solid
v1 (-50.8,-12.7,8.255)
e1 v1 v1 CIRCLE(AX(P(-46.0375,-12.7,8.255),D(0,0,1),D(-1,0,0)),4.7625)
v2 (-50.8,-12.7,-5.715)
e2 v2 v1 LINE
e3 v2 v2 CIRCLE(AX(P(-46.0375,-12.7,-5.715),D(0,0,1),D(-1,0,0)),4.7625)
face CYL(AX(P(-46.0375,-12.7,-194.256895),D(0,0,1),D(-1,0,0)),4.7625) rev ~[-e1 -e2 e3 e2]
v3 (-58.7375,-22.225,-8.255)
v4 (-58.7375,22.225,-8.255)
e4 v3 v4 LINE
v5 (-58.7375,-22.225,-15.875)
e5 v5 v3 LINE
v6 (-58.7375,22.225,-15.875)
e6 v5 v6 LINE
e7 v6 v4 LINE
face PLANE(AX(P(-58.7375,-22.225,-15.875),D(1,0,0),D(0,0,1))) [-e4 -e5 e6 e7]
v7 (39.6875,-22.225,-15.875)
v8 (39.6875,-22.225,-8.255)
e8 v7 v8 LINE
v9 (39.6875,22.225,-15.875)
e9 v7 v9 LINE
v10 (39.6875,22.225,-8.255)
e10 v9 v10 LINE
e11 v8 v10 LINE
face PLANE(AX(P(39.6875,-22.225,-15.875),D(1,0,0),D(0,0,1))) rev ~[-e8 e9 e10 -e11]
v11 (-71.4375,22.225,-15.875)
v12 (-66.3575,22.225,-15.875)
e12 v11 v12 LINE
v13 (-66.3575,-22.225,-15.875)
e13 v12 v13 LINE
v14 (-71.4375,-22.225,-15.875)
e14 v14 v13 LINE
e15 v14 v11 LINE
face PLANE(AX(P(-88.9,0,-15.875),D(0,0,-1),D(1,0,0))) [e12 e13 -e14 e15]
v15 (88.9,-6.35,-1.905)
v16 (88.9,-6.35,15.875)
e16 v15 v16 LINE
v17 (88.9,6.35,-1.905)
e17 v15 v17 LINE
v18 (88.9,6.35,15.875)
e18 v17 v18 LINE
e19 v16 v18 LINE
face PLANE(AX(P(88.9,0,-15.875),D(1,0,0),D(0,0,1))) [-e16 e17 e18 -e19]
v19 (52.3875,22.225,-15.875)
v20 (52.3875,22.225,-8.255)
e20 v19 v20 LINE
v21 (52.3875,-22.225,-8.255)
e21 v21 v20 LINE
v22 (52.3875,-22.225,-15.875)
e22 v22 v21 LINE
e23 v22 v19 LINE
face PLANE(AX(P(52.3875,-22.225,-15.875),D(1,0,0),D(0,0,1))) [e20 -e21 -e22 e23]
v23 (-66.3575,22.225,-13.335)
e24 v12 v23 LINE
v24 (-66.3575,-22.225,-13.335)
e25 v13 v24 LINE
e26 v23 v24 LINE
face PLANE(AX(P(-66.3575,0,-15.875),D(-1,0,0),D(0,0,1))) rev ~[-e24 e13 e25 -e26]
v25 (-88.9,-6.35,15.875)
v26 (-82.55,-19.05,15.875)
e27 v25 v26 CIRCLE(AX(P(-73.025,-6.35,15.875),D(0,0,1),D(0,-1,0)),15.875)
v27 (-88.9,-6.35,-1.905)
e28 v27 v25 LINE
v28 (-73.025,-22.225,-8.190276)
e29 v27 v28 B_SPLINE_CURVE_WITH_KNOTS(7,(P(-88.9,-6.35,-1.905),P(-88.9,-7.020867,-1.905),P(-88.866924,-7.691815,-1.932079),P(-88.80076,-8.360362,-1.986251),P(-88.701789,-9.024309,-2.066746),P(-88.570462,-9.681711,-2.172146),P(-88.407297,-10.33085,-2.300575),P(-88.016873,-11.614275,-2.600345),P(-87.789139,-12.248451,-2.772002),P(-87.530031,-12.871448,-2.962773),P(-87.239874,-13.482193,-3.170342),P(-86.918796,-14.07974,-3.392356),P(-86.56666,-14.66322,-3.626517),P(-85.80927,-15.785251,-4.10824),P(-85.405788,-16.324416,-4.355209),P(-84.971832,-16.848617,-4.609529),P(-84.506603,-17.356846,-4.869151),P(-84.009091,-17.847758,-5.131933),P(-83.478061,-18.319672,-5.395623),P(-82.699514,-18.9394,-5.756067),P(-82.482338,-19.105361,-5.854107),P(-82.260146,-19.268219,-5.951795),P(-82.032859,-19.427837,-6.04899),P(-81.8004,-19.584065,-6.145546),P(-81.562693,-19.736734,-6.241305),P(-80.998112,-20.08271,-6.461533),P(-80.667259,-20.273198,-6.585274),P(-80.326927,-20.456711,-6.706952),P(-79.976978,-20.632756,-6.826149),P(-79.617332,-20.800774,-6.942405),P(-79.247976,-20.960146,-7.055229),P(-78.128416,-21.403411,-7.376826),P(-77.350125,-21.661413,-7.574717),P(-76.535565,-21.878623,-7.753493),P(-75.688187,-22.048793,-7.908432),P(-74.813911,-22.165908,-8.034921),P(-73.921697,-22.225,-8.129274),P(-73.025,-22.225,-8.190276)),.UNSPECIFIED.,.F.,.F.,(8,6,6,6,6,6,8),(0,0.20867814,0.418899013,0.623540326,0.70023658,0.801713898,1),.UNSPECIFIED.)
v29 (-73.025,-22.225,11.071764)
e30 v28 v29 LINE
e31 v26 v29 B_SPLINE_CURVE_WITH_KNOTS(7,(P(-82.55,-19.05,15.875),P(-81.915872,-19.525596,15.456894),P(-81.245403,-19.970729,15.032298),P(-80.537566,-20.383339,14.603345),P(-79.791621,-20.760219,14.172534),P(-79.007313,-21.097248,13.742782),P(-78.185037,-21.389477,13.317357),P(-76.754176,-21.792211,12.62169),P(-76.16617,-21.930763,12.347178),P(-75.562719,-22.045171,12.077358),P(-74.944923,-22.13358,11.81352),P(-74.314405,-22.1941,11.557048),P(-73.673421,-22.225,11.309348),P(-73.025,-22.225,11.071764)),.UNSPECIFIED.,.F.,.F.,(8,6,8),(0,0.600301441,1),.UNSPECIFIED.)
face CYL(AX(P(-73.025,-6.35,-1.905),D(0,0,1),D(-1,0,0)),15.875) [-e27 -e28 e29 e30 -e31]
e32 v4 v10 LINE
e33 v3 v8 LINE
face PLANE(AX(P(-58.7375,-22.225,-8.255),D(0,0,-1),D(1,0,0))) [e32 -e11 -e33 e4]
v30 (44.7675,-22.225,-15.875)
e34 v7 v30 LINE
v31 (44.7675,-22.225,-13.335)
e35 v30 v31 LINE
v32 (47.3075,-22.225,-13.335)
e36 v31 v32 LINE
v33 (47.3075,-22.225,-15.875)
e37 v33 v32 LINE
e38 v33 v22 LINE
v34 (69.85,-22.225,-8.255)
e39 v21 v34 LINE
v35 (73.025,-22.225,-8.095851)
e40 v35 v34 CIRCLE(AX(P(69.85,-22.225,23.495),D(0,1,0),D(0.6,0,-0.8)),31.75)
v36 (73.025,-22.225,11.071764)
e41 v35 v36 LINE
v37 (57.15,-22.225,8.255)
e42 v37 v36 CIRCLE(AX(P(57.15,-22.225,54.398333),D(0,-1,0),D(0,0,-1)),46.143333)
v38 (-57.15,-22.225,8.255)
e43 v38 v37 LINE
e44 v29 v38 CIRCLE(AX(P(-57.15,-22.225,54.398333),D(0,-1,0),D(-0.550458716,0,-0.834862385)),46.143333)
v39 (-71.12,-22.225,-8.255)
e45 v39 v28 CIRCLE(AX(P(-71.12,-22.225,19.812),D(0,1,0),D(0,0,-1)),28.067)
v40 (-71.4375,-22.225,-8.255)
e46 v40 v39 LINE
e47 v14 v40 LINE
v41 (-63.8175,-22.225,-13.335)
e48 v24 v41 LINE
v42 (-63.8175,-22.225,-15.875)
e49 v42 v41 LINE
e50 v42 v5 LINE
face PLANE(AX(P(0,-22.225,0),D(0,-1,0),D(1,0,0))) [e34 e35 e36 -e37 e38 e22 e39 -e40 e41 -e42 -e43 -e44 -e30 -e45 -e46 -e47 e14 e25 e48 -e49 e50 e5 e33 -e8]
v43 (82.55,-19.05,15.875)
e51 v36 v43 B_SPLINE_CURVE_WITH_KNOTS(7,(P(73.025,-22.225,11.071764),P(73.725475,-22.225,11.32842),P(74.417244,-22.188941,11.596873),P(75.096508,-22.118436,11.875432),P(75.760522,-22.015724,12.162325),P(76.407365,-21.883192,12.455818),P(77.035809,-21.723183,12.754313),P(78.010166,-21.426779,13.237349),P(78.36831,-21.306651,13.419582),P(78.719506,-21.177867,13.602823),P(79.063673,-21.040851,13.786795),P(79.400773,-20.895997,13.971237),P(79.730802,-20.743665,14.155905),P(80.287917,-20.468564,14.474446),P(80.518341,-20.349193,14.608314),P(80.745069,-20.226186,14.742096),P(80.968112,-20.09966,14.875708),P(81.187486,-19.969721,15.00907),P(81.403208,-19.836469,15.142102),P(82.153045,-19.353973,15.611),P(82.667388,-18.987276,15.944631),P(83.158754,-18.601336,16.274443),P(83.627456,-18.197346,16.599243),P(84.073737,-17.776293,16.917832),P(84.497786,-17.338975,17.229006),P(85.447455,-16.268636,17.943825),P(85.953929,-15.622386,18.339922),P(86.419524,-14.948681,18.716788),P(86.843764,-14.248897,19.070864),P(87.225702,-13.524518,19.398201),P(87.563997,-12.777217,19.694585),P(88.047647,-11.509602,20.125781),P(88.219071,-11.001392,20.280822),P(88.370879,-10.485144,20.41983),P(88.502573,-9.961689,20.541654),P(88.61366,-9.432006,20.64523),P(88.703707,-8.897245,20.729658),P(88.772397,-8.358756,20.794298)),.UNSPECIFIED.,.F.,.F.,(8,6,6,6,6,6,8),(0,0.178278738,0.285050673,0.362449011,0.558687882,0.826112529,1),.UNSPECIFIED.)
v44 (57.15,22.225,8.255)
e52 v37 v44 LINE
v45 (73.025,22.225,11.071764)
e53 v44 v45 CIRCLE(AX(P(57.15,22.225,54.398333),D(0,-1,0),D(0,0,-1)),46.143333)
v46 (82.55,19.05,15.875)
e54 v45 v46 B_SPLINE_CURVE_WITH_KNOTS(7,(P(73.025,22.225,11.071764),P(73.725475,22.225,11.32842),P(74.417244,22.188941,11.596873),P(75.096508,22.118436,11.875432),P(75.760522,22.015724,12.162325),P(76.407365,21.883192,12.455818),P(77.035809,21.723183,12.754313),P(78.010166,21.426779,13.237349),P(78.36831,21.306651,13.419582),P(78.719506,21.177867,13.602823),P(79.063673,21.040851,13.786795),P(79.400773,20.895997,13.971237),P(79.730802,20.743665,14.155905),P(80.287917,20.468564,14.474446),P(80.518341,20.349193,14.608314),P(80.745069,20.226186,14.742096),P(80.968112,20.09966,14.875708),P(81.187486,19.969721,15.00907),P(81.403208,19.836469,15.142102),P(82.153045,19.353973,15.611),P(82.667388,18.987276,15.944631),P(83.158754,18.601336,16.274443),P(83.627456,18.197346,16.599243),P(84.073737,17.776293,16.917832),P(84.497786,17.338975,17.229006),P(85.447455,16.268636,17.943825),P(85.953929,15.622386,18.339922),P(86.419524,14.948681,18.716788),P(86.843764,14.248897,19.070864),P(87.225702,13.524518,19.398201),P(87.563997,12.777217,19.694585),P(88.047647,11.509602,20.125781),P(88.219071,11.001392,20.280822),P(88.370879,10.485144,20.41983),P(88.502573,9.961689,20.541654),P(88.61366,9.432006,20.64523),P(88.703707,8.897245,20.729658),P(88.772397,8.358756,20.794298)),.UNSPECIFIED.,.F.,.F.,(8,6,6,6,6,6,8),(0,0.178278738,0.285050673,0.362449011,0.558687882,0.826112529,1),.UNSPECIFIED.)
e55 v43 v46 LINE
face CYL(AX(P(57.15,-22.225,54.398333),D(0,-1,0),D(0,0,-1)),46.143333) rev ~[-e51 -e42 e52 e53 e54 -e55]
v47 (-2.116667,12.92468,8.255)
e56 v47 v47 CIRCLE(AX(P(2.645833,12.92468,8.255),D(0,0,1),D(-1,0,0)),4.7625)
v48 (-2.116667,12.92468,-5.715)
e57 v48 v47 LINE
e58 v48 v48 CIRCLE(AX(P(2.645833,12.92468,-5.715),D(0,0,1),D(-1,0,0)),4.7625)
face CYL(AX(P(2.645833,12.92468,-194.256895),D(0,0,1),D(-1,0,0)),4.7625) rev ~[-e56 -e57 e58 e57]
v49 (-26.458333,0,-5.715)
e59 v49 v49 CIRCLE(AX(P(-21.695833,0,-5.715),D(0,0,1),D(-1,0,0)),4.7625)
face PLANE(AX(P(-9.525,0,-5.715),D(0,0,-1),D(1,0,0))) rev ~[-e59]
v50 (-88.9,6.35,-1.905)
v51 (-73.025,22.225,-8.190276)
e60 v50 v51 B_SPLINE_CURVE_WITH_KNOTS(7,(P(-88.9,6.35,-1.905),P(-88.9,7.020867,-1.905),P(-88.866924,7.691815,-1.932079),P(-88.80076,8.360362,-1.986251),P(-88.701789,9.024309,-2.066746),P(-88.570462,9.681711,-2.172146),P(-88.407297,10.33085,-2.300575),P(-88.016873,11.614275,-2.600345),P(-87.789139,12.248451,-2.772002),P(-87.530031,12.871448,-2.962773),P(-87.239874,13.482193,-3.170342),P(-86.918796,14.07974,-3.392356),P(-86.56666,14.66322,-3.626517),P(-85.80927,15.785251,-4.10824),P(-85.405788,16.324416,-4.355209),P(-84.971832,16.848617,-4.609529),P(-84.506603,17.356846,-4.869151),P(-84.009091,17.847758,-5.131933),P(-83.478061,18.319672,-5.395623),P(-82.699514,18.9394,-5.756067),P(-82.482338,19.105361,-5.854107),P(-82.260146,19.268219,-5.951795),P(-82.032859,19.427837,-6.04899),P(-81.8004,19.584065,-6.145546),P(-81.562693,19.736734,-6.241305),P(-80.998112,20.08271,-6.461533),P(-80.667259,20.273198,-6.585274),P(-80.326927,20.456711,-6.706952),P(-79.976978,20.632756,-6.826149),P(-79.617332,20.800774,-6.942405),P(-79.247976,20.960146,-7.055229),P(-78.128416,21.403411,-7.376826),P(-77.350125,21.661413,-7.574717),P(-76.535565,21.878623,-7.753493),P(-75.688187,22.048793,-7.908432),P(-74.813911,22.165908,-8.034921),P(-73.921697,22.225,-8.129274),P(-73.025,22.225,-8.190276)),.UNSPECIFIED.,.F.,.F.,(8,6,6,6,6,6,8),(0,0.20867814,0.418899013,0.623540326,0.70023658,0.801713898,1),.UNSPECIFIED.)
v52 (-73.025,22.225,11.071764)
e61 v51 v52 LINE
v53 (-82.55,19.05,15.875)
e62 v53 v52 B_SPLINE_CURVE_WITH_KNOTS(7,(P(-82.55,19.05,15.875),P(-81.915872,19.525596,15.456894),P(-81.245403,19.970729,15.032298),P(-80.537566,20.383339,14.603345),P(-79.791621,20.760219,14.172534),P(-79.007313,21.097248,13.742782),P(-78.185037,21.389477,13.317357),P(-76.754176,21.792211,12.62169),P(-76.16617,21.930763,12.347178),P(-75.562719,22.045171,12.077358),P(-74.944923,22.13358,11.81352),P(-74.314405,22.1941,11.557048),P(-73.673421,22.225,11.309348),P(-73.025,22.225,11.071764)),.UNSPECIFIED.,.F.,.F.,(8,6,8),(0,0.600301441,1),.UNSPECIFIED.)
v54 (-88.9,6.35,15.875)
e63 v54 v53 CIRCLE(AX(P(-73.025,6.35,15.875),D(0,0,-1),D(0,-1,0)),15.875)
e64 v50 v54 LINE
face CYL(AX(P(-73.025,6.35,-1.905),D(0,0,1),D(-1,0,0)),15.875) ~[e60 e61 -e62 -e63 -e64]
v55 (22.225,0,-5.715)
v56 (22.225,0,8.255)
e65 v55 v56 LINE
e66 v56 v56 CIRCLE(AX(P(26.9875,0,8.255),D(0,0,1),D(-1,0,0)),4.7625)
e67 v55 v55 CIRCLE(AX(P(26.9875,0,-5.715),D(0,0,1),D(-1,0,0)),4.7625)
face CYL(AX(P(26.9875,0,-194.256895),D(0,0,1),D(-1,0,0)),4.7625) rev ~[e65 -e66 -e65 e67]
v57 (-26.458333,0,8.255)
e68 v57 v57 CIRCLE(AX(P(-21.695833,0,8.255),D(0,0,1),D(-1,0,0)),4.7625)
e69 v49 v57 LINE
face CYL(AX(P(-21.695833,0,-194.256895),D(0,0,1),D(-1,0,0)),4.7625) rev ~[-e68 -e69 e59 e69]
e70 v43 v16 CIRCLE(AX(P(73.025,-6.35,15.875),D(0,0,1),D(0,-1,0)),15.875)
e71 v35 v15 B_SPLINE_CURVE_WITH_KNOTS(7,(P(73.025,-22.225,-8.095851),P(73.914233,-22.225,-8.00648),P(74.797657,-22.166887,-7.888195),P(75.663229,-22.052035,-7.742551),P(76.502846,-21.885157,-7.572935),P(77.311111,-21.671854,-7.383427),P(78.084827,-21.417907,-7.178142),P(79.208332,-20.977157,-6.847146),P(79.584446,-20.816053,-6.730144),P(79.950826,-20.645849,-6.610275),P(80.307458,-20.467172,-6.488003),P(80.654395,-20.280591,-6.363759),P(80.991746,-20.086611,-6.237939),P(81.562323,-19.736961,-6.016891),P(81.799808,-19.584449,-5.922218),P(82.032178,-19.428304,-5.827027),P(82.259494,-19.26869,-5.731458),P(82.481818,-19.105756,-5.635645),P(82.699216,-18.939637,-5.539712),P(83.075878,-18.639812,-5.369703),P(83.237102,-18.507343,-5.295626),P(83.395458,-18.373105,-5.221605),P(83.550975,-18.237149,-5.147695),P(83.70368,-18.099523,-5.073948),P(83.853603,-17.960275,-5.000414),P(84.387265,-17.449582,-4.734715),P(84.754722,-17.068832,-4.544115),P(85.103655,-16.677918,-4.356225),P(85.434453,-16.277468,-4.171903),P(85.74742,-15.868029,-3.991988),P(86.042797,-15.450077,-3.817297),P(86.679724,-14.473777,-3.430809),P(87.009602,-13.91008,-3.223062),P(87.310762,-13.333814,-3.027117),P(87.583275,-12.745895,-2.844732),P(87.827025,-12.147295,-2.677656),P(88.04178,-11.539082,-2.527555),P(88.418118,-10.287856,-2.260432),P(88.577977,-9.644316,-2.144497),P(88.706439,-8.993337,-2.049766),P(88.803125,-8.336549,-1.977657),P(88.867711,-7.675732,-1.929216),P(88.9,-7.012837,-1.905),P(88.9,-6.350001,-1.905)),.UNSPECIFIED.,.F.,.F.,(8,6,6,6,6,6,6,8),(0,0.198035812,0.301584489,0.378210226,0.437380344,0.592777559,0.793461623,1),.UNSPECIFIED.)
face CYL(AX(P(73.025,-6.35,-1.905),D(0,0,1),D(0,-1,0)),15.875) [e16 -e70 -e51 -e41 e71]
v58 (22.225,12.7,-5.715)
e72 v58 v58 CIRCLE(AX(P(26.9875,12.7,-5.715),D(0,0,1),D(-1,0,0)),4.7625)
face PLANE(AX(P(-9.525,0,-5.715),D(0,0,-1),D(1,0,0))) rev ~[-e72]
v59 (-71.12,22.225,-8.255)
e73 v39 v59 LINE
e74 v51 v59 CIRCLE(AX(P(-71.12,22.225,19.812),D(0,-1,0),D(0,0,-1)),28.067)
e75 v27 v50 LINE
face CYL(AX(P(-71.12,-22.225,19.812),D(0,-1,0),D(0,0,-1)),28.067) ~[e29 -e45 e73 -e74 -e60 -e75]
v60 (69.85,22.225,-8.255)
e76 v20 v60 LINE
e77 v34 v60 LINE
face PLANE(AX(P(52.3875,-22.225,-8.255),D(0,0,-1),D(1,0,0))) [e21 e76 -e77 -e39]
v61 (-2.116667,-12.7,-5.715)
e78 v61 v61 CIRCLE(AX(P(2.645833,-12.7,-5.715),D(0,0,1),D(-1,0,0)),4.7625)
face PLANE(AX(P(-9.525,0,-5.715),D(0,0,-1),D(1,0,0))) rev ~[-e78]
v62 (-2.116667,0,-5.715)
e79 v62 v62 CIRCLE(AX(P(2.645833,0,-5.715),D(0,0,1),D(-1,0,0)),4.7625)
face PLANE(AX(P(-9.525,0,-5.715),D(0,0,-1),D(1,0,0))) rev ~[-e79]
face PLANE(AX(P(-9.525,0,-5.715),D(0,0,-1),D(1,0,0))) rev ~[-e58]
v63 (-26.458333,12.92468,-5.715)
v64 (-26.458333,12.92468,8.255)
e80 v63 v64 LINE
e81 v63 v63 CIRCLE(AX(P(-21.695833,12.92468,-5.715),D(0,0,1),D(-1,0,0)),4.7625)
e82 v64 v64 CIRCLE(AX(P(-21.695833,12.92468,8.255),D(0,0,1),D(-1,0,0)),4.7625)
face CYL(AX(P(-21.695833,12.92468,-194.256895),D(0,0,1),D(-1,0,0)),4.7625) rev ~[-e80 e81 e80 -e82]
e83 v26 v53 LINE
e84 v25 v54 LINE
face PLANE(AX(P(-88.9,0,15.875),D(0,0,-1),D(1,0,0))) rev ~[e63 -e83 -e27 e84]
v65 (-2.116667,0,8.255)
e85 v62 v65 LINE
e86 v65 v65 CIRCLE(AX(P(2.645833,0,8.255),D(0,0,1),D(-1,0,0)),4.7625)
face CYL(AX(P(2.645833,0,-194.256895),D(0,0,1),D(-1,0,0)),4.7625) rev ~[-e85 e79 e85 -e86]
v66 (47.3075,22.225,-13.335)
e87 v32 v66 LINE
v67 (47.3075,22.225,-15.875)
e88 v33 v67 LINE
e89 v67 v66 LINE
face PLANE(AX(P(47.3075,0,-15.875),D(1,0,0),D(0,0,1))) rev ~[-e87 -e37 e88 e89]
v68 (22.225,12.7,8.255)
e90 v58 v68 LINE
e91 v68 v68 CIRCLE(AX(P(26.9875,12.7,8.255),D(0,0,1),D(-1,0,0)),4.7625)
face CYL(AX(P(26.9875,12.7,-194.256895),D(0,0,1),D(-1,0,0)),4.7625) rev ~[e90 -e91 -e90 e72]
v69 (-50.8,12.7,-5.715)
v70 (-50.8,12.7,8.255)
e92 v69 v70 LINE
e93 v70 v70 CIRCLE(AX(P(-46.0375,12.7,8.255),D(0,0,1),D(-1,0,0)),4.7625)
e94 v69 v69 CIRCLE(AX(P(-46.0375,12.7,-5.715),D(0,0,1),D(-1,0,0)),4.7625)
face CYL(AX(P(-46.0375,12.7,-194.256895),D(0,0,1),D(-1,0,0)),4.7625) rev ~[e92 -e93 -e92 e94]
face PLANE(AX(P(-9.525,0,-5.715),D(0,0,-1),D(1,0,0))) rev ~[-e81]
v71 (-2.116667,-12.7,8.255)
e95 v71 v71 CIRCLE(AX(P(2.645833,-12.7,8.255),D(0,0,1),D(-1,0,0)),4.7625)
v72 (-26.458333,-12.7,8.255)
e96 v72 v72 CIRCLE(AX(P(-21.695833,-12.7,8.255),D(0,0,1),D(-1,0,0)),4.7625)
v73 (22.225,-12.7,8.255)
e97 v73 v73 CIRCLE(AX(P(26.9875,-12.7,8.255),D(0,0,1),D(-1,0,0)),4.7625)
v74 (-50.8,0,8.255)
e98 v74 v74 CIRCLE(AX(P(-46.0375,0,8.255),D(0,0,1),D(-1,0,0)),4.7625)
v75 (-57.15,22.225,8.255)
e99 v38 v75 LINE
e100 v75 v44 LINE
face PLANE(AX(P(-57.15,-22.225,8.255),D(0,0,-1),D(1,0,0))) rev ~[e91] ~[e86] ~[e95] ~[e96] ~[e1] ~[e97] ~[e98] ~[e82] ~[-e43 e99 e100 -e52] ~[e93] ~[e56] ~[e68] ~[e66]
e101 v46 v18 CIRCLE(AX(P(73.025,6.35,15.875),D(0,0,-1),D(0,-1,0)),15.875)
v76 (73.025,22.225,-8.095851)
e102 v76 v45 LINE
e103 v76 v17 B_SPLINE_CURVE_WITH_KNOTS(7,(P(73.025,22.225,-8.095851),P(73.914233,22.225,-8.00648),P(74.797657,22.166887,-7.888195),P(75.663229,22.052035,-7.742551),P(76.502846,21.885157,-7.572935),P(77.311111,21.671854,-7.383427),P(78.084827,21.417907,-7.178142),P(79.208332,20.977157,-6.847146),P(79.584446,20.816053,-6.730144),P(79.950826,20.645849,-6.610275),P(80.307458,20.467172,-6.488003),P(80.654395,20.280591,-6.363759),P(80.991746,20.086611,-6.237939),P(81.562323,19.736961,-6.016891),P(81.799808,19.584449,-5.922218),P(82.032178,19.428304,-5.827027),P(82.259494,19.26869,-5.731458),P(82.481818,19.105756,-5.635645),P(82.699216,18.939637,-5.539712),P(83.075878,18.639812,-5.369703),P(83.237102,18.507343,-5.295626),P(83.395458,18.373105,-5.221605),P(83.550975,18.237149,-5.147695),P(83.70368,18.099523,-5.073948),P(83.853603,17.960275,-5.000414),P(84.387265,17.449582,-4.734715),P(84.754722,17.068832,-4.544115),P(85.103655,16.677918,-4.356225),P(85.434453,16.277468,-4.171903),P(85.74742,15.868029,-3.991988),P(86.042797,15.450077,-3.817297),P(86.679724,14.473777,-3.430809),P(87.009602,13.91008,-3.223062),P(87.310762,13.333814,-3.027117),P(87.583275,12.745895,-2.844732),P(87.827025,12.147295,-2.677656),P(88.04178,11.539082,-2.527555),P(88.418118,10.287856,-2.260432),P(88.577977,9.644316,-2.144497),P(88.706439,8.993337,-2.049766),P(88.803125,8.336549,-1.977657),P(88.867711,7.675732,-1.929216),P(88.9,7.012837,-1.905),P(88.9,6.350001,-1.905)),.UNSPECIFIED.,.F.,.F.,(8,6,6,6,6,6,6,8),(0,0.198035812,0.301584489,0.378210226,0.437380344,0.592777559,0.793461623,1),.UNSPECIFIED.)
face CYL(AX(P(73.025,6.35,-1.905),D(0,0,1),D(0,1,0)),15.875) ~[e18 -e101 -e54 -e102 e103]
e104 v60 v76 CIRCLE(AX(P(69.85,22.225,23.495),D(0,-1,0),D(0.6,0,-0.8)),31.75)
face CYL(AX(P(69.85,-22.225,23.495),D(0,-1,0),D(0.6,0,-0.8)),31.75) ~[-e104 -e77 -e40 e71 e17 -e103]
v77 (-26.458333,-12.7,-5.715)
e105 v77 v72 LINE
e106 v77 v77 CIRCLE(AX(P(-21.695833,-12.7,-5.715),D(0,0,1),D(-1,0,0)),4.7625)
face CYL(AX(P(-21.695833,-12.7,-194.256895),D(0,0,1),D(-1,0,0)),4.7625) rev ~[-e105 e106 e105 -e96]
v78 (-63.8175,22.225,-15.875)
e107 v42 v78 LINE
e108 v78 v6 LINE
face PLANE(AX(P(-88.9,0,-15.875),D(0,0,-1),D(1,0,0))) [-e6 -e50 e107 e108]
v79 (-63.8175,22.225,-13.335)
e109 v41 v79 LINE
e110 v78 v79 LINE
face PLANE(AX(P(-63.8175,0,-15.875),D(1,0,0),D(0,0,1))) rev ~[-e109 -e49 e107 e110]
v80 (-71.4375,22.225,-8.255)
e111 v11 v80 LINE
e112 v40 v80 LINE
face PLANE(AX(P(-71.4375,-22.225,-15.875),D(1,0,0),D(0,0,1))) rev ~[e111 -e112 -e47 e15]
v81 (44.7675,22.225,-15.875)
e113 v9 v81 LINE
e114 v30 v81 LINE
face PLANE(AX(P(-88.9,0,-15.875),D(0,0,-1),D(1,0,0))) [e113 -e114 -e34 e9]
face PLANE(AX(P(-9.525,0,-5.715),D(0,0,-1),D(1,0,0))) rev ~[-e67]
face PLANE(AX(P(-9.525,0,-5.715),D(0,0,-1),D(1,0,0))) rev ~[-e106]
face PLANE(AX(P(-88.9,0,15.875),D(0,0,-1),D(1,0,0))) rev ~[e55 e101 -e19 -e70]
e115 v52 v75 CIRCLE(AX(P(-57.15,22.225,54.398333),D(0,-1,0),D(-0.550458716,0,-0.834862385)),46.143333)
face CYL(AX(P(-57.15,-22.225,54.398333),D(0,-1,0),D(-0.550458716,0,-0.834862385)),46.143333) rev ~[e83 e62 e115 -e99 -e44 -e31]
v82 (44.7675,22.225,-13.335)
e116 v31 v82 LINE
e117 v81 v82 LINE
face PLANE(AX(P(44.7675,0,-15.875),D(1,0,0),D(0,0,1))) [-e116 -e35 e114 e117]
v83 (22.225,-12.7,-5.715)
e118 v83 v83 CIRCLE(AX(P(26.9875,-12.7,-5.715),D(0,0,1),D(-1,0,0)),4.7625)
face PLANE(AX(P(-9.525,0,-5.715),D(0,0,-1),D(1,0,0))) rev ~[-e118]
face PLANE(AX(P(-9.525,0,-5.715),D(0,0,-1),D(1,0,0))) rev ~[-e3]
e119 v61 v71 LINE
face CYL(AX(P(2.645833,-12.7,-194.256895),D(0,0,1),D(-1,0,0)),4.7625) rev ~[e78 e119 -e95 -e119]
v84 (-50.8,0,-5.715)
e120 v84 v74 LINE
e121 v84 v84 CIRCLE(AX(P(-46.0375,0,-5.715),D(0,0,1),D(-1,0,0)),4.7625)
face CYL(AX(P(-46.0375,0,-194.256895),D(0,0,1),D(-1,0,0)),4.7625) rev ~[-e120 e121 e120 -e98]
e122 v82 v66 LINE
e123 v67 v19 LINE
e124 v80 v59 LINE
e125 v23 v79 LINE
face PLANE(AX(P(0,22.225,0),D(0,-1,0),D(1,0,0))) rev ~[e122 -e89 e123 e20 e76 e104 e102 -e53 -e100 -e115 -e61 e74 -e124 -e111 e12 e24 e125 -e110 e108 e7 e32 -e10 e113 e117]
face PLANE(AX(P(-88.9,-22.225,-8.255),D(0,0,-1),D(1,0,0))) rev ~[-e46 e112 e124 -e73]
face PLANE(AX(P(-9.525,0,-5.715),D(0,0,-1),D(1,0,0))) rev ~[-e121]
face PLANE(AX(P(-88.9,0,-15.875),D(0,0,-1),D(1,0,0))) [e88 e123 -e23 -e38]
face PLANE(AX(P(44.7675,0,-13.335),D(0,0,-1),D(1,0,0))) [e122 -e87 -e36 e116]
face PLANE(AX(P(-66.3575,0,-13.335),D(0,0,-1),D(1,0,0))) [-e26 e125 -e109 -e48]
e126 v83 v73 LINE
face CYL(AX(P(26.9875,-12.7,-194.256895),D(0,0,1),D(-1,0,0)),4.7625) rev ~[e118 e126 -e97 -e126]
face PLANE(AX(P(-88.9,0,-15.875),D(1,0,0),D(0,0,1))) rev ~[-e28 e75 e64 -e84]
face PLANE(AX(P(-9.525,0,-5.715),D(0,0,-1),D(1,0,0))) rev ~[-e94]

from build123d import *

# Parameters (mm, degrees)
F0_W          = 177.8
F0_H          = 31.75
F12_DEPTH     = 22.225
F1_W          = 2.54
F1_H          = 2.54
F2_DEPTH      = 22.225
F2_DEPTH_BACK = 22.225
F3_W          = 17.4625
F3_H          = 7.62
F3_W_2        = 98.425
F3_W_3        = 36.5125
F4_DEPTH      = 44.451
F6_DEPTH      = 44.451
F7_R          = 15.875
F9_D          = 9.525
F10_W         = 98.425
F10_H         = 44.45
F11_DEPTH     = 2.54


# Not quite as in the source:
# - a length typed as a fraction of an inch, garbled in the dataset ("3 / 203.2 mm" for 3/8 in), is restored


with BuildPart() as f12:
    # F0 (on Front) → F12 (new body, symmetric)
    with BuildSketch(Plane.XZ):
        Rectangle(F0_W, F0_H)
    extrude(amount=F12_DEPTH, both=True)

    # F1 (on Front) → F2 (cut, two sides)
    with BuildSketch(Plane.XZ) as f2_sk:
        with Locations((-65.0875, -14.605)):
            Rectangle(F1_W, F1_H)
        with Locations((46.0375, -14.605)):
            Rectangle(F1_W, F1_H)
    extrude(amount=F2_DEPTH, mode=Mode.SUBTRACT)
    extrude(f2_sk.sketch, amount=-F2_DEPTH_BACK, mode=Mode.SUBTRACT)

    # F3 (on face) → F4 (cut, through all)
    with BuildSketch(Plane.XZ.offset(22.225)):
        with Locations((-80.16875, -12.065)):
            Rectangle(F3_W, F3_H)
        with Locations((-9.525, -12.065)):
            Rectangle(F3_W_2, F3_H)
        with Locations((70.64375, -12.065)):
            Rectangle(F3_W_3, F3_H)
    extrude(amount=-F4_DEPTH, mode=Mode.SUBTRACT)

    # F5 (on face) → F6 (cut, through all)
    with BuildSketch(Plane.XZ.offset(22.225)):
        with BuildLine():
            Line((82.55, 15.875), (-82.55, 15.875))
            ThreePointArc((-82.55, 15.875), (-70.4091892663, 10.2010357789), (-57.15, 8.255))
            Line((-57.15, 8.255), (57.15, 8.255))
            ThreePointArc((57.15, 8.255), (70.4091892663, 10.2010357789), (82.55, 15.875))
        make_face()
        with BuildLine():
            ThreePointArc((-71.12, -8.255), (-80.5599536545, -6.6198702327), (-88.9, -1.905))
            Line((-88.9, -1.905), (-88.9, -8.255))
            Line((-88.9, -8.255), (-71.4375, -8.255))
            Line((-71.4375, -8.255), (-71.12, -8.255))
        make_face()
        with BuildLine():
            Line((88.9, -8.255), (88.9, -1.905))
            ThreePointArc((88.9, -1.905), (79.890231571, -6.6256947131), (69.85, -8.255))
            Line((69.85, -8.255), (88.9, -8.255))
        make_face()
    extrude(amount=-F6_DEPTH, mode=Mode.SUBTRACT)

    # F7
    f7_edges = [f12.edges().sort_by_distance(p)[0] for p in [
        (-88.9, -22.225, 6.985),
        (88.9, -22.225, 6.985),
        (88.9, 22.225, 6.985),
        (-88.9, 22.225, 6.985),
    ]]
    fillet(f7_edges, radius=F7_R)

    # F9 (through all)
    with Locations(Plane(origin=(0, 0, -8.255), x_dir=(1, 0, 0), z_dir=(0, 0, -1))):
        with Locations((-46.0375, 12.7), (-46.0375, 0), (-46.0375, -12.7), (26.9875, -12.7), (26.9875, 0), (26.9875, 12.7), (-21.6958333333, 12.7), (2.6458333333, 12.7), (2.6458333333, 0), (-21.6958333333, 0), (-21.6958333333, -12.924679948), (2.6458333333, -12.924679948)):
            Hole(F9_D / 2)

    # F10 (on face) → F11 (join)
    with BuildSketch(Plane(origin=(0, 0, -8.255), x_dir=(1, 0, 0), z_dir=(0, 0, -1))):
        with Locations((-9.525, 0)):
            Rectangle(F10_W, F10_H)
    extrude(amount=-F11_DEPTH)


solid = f12.part
